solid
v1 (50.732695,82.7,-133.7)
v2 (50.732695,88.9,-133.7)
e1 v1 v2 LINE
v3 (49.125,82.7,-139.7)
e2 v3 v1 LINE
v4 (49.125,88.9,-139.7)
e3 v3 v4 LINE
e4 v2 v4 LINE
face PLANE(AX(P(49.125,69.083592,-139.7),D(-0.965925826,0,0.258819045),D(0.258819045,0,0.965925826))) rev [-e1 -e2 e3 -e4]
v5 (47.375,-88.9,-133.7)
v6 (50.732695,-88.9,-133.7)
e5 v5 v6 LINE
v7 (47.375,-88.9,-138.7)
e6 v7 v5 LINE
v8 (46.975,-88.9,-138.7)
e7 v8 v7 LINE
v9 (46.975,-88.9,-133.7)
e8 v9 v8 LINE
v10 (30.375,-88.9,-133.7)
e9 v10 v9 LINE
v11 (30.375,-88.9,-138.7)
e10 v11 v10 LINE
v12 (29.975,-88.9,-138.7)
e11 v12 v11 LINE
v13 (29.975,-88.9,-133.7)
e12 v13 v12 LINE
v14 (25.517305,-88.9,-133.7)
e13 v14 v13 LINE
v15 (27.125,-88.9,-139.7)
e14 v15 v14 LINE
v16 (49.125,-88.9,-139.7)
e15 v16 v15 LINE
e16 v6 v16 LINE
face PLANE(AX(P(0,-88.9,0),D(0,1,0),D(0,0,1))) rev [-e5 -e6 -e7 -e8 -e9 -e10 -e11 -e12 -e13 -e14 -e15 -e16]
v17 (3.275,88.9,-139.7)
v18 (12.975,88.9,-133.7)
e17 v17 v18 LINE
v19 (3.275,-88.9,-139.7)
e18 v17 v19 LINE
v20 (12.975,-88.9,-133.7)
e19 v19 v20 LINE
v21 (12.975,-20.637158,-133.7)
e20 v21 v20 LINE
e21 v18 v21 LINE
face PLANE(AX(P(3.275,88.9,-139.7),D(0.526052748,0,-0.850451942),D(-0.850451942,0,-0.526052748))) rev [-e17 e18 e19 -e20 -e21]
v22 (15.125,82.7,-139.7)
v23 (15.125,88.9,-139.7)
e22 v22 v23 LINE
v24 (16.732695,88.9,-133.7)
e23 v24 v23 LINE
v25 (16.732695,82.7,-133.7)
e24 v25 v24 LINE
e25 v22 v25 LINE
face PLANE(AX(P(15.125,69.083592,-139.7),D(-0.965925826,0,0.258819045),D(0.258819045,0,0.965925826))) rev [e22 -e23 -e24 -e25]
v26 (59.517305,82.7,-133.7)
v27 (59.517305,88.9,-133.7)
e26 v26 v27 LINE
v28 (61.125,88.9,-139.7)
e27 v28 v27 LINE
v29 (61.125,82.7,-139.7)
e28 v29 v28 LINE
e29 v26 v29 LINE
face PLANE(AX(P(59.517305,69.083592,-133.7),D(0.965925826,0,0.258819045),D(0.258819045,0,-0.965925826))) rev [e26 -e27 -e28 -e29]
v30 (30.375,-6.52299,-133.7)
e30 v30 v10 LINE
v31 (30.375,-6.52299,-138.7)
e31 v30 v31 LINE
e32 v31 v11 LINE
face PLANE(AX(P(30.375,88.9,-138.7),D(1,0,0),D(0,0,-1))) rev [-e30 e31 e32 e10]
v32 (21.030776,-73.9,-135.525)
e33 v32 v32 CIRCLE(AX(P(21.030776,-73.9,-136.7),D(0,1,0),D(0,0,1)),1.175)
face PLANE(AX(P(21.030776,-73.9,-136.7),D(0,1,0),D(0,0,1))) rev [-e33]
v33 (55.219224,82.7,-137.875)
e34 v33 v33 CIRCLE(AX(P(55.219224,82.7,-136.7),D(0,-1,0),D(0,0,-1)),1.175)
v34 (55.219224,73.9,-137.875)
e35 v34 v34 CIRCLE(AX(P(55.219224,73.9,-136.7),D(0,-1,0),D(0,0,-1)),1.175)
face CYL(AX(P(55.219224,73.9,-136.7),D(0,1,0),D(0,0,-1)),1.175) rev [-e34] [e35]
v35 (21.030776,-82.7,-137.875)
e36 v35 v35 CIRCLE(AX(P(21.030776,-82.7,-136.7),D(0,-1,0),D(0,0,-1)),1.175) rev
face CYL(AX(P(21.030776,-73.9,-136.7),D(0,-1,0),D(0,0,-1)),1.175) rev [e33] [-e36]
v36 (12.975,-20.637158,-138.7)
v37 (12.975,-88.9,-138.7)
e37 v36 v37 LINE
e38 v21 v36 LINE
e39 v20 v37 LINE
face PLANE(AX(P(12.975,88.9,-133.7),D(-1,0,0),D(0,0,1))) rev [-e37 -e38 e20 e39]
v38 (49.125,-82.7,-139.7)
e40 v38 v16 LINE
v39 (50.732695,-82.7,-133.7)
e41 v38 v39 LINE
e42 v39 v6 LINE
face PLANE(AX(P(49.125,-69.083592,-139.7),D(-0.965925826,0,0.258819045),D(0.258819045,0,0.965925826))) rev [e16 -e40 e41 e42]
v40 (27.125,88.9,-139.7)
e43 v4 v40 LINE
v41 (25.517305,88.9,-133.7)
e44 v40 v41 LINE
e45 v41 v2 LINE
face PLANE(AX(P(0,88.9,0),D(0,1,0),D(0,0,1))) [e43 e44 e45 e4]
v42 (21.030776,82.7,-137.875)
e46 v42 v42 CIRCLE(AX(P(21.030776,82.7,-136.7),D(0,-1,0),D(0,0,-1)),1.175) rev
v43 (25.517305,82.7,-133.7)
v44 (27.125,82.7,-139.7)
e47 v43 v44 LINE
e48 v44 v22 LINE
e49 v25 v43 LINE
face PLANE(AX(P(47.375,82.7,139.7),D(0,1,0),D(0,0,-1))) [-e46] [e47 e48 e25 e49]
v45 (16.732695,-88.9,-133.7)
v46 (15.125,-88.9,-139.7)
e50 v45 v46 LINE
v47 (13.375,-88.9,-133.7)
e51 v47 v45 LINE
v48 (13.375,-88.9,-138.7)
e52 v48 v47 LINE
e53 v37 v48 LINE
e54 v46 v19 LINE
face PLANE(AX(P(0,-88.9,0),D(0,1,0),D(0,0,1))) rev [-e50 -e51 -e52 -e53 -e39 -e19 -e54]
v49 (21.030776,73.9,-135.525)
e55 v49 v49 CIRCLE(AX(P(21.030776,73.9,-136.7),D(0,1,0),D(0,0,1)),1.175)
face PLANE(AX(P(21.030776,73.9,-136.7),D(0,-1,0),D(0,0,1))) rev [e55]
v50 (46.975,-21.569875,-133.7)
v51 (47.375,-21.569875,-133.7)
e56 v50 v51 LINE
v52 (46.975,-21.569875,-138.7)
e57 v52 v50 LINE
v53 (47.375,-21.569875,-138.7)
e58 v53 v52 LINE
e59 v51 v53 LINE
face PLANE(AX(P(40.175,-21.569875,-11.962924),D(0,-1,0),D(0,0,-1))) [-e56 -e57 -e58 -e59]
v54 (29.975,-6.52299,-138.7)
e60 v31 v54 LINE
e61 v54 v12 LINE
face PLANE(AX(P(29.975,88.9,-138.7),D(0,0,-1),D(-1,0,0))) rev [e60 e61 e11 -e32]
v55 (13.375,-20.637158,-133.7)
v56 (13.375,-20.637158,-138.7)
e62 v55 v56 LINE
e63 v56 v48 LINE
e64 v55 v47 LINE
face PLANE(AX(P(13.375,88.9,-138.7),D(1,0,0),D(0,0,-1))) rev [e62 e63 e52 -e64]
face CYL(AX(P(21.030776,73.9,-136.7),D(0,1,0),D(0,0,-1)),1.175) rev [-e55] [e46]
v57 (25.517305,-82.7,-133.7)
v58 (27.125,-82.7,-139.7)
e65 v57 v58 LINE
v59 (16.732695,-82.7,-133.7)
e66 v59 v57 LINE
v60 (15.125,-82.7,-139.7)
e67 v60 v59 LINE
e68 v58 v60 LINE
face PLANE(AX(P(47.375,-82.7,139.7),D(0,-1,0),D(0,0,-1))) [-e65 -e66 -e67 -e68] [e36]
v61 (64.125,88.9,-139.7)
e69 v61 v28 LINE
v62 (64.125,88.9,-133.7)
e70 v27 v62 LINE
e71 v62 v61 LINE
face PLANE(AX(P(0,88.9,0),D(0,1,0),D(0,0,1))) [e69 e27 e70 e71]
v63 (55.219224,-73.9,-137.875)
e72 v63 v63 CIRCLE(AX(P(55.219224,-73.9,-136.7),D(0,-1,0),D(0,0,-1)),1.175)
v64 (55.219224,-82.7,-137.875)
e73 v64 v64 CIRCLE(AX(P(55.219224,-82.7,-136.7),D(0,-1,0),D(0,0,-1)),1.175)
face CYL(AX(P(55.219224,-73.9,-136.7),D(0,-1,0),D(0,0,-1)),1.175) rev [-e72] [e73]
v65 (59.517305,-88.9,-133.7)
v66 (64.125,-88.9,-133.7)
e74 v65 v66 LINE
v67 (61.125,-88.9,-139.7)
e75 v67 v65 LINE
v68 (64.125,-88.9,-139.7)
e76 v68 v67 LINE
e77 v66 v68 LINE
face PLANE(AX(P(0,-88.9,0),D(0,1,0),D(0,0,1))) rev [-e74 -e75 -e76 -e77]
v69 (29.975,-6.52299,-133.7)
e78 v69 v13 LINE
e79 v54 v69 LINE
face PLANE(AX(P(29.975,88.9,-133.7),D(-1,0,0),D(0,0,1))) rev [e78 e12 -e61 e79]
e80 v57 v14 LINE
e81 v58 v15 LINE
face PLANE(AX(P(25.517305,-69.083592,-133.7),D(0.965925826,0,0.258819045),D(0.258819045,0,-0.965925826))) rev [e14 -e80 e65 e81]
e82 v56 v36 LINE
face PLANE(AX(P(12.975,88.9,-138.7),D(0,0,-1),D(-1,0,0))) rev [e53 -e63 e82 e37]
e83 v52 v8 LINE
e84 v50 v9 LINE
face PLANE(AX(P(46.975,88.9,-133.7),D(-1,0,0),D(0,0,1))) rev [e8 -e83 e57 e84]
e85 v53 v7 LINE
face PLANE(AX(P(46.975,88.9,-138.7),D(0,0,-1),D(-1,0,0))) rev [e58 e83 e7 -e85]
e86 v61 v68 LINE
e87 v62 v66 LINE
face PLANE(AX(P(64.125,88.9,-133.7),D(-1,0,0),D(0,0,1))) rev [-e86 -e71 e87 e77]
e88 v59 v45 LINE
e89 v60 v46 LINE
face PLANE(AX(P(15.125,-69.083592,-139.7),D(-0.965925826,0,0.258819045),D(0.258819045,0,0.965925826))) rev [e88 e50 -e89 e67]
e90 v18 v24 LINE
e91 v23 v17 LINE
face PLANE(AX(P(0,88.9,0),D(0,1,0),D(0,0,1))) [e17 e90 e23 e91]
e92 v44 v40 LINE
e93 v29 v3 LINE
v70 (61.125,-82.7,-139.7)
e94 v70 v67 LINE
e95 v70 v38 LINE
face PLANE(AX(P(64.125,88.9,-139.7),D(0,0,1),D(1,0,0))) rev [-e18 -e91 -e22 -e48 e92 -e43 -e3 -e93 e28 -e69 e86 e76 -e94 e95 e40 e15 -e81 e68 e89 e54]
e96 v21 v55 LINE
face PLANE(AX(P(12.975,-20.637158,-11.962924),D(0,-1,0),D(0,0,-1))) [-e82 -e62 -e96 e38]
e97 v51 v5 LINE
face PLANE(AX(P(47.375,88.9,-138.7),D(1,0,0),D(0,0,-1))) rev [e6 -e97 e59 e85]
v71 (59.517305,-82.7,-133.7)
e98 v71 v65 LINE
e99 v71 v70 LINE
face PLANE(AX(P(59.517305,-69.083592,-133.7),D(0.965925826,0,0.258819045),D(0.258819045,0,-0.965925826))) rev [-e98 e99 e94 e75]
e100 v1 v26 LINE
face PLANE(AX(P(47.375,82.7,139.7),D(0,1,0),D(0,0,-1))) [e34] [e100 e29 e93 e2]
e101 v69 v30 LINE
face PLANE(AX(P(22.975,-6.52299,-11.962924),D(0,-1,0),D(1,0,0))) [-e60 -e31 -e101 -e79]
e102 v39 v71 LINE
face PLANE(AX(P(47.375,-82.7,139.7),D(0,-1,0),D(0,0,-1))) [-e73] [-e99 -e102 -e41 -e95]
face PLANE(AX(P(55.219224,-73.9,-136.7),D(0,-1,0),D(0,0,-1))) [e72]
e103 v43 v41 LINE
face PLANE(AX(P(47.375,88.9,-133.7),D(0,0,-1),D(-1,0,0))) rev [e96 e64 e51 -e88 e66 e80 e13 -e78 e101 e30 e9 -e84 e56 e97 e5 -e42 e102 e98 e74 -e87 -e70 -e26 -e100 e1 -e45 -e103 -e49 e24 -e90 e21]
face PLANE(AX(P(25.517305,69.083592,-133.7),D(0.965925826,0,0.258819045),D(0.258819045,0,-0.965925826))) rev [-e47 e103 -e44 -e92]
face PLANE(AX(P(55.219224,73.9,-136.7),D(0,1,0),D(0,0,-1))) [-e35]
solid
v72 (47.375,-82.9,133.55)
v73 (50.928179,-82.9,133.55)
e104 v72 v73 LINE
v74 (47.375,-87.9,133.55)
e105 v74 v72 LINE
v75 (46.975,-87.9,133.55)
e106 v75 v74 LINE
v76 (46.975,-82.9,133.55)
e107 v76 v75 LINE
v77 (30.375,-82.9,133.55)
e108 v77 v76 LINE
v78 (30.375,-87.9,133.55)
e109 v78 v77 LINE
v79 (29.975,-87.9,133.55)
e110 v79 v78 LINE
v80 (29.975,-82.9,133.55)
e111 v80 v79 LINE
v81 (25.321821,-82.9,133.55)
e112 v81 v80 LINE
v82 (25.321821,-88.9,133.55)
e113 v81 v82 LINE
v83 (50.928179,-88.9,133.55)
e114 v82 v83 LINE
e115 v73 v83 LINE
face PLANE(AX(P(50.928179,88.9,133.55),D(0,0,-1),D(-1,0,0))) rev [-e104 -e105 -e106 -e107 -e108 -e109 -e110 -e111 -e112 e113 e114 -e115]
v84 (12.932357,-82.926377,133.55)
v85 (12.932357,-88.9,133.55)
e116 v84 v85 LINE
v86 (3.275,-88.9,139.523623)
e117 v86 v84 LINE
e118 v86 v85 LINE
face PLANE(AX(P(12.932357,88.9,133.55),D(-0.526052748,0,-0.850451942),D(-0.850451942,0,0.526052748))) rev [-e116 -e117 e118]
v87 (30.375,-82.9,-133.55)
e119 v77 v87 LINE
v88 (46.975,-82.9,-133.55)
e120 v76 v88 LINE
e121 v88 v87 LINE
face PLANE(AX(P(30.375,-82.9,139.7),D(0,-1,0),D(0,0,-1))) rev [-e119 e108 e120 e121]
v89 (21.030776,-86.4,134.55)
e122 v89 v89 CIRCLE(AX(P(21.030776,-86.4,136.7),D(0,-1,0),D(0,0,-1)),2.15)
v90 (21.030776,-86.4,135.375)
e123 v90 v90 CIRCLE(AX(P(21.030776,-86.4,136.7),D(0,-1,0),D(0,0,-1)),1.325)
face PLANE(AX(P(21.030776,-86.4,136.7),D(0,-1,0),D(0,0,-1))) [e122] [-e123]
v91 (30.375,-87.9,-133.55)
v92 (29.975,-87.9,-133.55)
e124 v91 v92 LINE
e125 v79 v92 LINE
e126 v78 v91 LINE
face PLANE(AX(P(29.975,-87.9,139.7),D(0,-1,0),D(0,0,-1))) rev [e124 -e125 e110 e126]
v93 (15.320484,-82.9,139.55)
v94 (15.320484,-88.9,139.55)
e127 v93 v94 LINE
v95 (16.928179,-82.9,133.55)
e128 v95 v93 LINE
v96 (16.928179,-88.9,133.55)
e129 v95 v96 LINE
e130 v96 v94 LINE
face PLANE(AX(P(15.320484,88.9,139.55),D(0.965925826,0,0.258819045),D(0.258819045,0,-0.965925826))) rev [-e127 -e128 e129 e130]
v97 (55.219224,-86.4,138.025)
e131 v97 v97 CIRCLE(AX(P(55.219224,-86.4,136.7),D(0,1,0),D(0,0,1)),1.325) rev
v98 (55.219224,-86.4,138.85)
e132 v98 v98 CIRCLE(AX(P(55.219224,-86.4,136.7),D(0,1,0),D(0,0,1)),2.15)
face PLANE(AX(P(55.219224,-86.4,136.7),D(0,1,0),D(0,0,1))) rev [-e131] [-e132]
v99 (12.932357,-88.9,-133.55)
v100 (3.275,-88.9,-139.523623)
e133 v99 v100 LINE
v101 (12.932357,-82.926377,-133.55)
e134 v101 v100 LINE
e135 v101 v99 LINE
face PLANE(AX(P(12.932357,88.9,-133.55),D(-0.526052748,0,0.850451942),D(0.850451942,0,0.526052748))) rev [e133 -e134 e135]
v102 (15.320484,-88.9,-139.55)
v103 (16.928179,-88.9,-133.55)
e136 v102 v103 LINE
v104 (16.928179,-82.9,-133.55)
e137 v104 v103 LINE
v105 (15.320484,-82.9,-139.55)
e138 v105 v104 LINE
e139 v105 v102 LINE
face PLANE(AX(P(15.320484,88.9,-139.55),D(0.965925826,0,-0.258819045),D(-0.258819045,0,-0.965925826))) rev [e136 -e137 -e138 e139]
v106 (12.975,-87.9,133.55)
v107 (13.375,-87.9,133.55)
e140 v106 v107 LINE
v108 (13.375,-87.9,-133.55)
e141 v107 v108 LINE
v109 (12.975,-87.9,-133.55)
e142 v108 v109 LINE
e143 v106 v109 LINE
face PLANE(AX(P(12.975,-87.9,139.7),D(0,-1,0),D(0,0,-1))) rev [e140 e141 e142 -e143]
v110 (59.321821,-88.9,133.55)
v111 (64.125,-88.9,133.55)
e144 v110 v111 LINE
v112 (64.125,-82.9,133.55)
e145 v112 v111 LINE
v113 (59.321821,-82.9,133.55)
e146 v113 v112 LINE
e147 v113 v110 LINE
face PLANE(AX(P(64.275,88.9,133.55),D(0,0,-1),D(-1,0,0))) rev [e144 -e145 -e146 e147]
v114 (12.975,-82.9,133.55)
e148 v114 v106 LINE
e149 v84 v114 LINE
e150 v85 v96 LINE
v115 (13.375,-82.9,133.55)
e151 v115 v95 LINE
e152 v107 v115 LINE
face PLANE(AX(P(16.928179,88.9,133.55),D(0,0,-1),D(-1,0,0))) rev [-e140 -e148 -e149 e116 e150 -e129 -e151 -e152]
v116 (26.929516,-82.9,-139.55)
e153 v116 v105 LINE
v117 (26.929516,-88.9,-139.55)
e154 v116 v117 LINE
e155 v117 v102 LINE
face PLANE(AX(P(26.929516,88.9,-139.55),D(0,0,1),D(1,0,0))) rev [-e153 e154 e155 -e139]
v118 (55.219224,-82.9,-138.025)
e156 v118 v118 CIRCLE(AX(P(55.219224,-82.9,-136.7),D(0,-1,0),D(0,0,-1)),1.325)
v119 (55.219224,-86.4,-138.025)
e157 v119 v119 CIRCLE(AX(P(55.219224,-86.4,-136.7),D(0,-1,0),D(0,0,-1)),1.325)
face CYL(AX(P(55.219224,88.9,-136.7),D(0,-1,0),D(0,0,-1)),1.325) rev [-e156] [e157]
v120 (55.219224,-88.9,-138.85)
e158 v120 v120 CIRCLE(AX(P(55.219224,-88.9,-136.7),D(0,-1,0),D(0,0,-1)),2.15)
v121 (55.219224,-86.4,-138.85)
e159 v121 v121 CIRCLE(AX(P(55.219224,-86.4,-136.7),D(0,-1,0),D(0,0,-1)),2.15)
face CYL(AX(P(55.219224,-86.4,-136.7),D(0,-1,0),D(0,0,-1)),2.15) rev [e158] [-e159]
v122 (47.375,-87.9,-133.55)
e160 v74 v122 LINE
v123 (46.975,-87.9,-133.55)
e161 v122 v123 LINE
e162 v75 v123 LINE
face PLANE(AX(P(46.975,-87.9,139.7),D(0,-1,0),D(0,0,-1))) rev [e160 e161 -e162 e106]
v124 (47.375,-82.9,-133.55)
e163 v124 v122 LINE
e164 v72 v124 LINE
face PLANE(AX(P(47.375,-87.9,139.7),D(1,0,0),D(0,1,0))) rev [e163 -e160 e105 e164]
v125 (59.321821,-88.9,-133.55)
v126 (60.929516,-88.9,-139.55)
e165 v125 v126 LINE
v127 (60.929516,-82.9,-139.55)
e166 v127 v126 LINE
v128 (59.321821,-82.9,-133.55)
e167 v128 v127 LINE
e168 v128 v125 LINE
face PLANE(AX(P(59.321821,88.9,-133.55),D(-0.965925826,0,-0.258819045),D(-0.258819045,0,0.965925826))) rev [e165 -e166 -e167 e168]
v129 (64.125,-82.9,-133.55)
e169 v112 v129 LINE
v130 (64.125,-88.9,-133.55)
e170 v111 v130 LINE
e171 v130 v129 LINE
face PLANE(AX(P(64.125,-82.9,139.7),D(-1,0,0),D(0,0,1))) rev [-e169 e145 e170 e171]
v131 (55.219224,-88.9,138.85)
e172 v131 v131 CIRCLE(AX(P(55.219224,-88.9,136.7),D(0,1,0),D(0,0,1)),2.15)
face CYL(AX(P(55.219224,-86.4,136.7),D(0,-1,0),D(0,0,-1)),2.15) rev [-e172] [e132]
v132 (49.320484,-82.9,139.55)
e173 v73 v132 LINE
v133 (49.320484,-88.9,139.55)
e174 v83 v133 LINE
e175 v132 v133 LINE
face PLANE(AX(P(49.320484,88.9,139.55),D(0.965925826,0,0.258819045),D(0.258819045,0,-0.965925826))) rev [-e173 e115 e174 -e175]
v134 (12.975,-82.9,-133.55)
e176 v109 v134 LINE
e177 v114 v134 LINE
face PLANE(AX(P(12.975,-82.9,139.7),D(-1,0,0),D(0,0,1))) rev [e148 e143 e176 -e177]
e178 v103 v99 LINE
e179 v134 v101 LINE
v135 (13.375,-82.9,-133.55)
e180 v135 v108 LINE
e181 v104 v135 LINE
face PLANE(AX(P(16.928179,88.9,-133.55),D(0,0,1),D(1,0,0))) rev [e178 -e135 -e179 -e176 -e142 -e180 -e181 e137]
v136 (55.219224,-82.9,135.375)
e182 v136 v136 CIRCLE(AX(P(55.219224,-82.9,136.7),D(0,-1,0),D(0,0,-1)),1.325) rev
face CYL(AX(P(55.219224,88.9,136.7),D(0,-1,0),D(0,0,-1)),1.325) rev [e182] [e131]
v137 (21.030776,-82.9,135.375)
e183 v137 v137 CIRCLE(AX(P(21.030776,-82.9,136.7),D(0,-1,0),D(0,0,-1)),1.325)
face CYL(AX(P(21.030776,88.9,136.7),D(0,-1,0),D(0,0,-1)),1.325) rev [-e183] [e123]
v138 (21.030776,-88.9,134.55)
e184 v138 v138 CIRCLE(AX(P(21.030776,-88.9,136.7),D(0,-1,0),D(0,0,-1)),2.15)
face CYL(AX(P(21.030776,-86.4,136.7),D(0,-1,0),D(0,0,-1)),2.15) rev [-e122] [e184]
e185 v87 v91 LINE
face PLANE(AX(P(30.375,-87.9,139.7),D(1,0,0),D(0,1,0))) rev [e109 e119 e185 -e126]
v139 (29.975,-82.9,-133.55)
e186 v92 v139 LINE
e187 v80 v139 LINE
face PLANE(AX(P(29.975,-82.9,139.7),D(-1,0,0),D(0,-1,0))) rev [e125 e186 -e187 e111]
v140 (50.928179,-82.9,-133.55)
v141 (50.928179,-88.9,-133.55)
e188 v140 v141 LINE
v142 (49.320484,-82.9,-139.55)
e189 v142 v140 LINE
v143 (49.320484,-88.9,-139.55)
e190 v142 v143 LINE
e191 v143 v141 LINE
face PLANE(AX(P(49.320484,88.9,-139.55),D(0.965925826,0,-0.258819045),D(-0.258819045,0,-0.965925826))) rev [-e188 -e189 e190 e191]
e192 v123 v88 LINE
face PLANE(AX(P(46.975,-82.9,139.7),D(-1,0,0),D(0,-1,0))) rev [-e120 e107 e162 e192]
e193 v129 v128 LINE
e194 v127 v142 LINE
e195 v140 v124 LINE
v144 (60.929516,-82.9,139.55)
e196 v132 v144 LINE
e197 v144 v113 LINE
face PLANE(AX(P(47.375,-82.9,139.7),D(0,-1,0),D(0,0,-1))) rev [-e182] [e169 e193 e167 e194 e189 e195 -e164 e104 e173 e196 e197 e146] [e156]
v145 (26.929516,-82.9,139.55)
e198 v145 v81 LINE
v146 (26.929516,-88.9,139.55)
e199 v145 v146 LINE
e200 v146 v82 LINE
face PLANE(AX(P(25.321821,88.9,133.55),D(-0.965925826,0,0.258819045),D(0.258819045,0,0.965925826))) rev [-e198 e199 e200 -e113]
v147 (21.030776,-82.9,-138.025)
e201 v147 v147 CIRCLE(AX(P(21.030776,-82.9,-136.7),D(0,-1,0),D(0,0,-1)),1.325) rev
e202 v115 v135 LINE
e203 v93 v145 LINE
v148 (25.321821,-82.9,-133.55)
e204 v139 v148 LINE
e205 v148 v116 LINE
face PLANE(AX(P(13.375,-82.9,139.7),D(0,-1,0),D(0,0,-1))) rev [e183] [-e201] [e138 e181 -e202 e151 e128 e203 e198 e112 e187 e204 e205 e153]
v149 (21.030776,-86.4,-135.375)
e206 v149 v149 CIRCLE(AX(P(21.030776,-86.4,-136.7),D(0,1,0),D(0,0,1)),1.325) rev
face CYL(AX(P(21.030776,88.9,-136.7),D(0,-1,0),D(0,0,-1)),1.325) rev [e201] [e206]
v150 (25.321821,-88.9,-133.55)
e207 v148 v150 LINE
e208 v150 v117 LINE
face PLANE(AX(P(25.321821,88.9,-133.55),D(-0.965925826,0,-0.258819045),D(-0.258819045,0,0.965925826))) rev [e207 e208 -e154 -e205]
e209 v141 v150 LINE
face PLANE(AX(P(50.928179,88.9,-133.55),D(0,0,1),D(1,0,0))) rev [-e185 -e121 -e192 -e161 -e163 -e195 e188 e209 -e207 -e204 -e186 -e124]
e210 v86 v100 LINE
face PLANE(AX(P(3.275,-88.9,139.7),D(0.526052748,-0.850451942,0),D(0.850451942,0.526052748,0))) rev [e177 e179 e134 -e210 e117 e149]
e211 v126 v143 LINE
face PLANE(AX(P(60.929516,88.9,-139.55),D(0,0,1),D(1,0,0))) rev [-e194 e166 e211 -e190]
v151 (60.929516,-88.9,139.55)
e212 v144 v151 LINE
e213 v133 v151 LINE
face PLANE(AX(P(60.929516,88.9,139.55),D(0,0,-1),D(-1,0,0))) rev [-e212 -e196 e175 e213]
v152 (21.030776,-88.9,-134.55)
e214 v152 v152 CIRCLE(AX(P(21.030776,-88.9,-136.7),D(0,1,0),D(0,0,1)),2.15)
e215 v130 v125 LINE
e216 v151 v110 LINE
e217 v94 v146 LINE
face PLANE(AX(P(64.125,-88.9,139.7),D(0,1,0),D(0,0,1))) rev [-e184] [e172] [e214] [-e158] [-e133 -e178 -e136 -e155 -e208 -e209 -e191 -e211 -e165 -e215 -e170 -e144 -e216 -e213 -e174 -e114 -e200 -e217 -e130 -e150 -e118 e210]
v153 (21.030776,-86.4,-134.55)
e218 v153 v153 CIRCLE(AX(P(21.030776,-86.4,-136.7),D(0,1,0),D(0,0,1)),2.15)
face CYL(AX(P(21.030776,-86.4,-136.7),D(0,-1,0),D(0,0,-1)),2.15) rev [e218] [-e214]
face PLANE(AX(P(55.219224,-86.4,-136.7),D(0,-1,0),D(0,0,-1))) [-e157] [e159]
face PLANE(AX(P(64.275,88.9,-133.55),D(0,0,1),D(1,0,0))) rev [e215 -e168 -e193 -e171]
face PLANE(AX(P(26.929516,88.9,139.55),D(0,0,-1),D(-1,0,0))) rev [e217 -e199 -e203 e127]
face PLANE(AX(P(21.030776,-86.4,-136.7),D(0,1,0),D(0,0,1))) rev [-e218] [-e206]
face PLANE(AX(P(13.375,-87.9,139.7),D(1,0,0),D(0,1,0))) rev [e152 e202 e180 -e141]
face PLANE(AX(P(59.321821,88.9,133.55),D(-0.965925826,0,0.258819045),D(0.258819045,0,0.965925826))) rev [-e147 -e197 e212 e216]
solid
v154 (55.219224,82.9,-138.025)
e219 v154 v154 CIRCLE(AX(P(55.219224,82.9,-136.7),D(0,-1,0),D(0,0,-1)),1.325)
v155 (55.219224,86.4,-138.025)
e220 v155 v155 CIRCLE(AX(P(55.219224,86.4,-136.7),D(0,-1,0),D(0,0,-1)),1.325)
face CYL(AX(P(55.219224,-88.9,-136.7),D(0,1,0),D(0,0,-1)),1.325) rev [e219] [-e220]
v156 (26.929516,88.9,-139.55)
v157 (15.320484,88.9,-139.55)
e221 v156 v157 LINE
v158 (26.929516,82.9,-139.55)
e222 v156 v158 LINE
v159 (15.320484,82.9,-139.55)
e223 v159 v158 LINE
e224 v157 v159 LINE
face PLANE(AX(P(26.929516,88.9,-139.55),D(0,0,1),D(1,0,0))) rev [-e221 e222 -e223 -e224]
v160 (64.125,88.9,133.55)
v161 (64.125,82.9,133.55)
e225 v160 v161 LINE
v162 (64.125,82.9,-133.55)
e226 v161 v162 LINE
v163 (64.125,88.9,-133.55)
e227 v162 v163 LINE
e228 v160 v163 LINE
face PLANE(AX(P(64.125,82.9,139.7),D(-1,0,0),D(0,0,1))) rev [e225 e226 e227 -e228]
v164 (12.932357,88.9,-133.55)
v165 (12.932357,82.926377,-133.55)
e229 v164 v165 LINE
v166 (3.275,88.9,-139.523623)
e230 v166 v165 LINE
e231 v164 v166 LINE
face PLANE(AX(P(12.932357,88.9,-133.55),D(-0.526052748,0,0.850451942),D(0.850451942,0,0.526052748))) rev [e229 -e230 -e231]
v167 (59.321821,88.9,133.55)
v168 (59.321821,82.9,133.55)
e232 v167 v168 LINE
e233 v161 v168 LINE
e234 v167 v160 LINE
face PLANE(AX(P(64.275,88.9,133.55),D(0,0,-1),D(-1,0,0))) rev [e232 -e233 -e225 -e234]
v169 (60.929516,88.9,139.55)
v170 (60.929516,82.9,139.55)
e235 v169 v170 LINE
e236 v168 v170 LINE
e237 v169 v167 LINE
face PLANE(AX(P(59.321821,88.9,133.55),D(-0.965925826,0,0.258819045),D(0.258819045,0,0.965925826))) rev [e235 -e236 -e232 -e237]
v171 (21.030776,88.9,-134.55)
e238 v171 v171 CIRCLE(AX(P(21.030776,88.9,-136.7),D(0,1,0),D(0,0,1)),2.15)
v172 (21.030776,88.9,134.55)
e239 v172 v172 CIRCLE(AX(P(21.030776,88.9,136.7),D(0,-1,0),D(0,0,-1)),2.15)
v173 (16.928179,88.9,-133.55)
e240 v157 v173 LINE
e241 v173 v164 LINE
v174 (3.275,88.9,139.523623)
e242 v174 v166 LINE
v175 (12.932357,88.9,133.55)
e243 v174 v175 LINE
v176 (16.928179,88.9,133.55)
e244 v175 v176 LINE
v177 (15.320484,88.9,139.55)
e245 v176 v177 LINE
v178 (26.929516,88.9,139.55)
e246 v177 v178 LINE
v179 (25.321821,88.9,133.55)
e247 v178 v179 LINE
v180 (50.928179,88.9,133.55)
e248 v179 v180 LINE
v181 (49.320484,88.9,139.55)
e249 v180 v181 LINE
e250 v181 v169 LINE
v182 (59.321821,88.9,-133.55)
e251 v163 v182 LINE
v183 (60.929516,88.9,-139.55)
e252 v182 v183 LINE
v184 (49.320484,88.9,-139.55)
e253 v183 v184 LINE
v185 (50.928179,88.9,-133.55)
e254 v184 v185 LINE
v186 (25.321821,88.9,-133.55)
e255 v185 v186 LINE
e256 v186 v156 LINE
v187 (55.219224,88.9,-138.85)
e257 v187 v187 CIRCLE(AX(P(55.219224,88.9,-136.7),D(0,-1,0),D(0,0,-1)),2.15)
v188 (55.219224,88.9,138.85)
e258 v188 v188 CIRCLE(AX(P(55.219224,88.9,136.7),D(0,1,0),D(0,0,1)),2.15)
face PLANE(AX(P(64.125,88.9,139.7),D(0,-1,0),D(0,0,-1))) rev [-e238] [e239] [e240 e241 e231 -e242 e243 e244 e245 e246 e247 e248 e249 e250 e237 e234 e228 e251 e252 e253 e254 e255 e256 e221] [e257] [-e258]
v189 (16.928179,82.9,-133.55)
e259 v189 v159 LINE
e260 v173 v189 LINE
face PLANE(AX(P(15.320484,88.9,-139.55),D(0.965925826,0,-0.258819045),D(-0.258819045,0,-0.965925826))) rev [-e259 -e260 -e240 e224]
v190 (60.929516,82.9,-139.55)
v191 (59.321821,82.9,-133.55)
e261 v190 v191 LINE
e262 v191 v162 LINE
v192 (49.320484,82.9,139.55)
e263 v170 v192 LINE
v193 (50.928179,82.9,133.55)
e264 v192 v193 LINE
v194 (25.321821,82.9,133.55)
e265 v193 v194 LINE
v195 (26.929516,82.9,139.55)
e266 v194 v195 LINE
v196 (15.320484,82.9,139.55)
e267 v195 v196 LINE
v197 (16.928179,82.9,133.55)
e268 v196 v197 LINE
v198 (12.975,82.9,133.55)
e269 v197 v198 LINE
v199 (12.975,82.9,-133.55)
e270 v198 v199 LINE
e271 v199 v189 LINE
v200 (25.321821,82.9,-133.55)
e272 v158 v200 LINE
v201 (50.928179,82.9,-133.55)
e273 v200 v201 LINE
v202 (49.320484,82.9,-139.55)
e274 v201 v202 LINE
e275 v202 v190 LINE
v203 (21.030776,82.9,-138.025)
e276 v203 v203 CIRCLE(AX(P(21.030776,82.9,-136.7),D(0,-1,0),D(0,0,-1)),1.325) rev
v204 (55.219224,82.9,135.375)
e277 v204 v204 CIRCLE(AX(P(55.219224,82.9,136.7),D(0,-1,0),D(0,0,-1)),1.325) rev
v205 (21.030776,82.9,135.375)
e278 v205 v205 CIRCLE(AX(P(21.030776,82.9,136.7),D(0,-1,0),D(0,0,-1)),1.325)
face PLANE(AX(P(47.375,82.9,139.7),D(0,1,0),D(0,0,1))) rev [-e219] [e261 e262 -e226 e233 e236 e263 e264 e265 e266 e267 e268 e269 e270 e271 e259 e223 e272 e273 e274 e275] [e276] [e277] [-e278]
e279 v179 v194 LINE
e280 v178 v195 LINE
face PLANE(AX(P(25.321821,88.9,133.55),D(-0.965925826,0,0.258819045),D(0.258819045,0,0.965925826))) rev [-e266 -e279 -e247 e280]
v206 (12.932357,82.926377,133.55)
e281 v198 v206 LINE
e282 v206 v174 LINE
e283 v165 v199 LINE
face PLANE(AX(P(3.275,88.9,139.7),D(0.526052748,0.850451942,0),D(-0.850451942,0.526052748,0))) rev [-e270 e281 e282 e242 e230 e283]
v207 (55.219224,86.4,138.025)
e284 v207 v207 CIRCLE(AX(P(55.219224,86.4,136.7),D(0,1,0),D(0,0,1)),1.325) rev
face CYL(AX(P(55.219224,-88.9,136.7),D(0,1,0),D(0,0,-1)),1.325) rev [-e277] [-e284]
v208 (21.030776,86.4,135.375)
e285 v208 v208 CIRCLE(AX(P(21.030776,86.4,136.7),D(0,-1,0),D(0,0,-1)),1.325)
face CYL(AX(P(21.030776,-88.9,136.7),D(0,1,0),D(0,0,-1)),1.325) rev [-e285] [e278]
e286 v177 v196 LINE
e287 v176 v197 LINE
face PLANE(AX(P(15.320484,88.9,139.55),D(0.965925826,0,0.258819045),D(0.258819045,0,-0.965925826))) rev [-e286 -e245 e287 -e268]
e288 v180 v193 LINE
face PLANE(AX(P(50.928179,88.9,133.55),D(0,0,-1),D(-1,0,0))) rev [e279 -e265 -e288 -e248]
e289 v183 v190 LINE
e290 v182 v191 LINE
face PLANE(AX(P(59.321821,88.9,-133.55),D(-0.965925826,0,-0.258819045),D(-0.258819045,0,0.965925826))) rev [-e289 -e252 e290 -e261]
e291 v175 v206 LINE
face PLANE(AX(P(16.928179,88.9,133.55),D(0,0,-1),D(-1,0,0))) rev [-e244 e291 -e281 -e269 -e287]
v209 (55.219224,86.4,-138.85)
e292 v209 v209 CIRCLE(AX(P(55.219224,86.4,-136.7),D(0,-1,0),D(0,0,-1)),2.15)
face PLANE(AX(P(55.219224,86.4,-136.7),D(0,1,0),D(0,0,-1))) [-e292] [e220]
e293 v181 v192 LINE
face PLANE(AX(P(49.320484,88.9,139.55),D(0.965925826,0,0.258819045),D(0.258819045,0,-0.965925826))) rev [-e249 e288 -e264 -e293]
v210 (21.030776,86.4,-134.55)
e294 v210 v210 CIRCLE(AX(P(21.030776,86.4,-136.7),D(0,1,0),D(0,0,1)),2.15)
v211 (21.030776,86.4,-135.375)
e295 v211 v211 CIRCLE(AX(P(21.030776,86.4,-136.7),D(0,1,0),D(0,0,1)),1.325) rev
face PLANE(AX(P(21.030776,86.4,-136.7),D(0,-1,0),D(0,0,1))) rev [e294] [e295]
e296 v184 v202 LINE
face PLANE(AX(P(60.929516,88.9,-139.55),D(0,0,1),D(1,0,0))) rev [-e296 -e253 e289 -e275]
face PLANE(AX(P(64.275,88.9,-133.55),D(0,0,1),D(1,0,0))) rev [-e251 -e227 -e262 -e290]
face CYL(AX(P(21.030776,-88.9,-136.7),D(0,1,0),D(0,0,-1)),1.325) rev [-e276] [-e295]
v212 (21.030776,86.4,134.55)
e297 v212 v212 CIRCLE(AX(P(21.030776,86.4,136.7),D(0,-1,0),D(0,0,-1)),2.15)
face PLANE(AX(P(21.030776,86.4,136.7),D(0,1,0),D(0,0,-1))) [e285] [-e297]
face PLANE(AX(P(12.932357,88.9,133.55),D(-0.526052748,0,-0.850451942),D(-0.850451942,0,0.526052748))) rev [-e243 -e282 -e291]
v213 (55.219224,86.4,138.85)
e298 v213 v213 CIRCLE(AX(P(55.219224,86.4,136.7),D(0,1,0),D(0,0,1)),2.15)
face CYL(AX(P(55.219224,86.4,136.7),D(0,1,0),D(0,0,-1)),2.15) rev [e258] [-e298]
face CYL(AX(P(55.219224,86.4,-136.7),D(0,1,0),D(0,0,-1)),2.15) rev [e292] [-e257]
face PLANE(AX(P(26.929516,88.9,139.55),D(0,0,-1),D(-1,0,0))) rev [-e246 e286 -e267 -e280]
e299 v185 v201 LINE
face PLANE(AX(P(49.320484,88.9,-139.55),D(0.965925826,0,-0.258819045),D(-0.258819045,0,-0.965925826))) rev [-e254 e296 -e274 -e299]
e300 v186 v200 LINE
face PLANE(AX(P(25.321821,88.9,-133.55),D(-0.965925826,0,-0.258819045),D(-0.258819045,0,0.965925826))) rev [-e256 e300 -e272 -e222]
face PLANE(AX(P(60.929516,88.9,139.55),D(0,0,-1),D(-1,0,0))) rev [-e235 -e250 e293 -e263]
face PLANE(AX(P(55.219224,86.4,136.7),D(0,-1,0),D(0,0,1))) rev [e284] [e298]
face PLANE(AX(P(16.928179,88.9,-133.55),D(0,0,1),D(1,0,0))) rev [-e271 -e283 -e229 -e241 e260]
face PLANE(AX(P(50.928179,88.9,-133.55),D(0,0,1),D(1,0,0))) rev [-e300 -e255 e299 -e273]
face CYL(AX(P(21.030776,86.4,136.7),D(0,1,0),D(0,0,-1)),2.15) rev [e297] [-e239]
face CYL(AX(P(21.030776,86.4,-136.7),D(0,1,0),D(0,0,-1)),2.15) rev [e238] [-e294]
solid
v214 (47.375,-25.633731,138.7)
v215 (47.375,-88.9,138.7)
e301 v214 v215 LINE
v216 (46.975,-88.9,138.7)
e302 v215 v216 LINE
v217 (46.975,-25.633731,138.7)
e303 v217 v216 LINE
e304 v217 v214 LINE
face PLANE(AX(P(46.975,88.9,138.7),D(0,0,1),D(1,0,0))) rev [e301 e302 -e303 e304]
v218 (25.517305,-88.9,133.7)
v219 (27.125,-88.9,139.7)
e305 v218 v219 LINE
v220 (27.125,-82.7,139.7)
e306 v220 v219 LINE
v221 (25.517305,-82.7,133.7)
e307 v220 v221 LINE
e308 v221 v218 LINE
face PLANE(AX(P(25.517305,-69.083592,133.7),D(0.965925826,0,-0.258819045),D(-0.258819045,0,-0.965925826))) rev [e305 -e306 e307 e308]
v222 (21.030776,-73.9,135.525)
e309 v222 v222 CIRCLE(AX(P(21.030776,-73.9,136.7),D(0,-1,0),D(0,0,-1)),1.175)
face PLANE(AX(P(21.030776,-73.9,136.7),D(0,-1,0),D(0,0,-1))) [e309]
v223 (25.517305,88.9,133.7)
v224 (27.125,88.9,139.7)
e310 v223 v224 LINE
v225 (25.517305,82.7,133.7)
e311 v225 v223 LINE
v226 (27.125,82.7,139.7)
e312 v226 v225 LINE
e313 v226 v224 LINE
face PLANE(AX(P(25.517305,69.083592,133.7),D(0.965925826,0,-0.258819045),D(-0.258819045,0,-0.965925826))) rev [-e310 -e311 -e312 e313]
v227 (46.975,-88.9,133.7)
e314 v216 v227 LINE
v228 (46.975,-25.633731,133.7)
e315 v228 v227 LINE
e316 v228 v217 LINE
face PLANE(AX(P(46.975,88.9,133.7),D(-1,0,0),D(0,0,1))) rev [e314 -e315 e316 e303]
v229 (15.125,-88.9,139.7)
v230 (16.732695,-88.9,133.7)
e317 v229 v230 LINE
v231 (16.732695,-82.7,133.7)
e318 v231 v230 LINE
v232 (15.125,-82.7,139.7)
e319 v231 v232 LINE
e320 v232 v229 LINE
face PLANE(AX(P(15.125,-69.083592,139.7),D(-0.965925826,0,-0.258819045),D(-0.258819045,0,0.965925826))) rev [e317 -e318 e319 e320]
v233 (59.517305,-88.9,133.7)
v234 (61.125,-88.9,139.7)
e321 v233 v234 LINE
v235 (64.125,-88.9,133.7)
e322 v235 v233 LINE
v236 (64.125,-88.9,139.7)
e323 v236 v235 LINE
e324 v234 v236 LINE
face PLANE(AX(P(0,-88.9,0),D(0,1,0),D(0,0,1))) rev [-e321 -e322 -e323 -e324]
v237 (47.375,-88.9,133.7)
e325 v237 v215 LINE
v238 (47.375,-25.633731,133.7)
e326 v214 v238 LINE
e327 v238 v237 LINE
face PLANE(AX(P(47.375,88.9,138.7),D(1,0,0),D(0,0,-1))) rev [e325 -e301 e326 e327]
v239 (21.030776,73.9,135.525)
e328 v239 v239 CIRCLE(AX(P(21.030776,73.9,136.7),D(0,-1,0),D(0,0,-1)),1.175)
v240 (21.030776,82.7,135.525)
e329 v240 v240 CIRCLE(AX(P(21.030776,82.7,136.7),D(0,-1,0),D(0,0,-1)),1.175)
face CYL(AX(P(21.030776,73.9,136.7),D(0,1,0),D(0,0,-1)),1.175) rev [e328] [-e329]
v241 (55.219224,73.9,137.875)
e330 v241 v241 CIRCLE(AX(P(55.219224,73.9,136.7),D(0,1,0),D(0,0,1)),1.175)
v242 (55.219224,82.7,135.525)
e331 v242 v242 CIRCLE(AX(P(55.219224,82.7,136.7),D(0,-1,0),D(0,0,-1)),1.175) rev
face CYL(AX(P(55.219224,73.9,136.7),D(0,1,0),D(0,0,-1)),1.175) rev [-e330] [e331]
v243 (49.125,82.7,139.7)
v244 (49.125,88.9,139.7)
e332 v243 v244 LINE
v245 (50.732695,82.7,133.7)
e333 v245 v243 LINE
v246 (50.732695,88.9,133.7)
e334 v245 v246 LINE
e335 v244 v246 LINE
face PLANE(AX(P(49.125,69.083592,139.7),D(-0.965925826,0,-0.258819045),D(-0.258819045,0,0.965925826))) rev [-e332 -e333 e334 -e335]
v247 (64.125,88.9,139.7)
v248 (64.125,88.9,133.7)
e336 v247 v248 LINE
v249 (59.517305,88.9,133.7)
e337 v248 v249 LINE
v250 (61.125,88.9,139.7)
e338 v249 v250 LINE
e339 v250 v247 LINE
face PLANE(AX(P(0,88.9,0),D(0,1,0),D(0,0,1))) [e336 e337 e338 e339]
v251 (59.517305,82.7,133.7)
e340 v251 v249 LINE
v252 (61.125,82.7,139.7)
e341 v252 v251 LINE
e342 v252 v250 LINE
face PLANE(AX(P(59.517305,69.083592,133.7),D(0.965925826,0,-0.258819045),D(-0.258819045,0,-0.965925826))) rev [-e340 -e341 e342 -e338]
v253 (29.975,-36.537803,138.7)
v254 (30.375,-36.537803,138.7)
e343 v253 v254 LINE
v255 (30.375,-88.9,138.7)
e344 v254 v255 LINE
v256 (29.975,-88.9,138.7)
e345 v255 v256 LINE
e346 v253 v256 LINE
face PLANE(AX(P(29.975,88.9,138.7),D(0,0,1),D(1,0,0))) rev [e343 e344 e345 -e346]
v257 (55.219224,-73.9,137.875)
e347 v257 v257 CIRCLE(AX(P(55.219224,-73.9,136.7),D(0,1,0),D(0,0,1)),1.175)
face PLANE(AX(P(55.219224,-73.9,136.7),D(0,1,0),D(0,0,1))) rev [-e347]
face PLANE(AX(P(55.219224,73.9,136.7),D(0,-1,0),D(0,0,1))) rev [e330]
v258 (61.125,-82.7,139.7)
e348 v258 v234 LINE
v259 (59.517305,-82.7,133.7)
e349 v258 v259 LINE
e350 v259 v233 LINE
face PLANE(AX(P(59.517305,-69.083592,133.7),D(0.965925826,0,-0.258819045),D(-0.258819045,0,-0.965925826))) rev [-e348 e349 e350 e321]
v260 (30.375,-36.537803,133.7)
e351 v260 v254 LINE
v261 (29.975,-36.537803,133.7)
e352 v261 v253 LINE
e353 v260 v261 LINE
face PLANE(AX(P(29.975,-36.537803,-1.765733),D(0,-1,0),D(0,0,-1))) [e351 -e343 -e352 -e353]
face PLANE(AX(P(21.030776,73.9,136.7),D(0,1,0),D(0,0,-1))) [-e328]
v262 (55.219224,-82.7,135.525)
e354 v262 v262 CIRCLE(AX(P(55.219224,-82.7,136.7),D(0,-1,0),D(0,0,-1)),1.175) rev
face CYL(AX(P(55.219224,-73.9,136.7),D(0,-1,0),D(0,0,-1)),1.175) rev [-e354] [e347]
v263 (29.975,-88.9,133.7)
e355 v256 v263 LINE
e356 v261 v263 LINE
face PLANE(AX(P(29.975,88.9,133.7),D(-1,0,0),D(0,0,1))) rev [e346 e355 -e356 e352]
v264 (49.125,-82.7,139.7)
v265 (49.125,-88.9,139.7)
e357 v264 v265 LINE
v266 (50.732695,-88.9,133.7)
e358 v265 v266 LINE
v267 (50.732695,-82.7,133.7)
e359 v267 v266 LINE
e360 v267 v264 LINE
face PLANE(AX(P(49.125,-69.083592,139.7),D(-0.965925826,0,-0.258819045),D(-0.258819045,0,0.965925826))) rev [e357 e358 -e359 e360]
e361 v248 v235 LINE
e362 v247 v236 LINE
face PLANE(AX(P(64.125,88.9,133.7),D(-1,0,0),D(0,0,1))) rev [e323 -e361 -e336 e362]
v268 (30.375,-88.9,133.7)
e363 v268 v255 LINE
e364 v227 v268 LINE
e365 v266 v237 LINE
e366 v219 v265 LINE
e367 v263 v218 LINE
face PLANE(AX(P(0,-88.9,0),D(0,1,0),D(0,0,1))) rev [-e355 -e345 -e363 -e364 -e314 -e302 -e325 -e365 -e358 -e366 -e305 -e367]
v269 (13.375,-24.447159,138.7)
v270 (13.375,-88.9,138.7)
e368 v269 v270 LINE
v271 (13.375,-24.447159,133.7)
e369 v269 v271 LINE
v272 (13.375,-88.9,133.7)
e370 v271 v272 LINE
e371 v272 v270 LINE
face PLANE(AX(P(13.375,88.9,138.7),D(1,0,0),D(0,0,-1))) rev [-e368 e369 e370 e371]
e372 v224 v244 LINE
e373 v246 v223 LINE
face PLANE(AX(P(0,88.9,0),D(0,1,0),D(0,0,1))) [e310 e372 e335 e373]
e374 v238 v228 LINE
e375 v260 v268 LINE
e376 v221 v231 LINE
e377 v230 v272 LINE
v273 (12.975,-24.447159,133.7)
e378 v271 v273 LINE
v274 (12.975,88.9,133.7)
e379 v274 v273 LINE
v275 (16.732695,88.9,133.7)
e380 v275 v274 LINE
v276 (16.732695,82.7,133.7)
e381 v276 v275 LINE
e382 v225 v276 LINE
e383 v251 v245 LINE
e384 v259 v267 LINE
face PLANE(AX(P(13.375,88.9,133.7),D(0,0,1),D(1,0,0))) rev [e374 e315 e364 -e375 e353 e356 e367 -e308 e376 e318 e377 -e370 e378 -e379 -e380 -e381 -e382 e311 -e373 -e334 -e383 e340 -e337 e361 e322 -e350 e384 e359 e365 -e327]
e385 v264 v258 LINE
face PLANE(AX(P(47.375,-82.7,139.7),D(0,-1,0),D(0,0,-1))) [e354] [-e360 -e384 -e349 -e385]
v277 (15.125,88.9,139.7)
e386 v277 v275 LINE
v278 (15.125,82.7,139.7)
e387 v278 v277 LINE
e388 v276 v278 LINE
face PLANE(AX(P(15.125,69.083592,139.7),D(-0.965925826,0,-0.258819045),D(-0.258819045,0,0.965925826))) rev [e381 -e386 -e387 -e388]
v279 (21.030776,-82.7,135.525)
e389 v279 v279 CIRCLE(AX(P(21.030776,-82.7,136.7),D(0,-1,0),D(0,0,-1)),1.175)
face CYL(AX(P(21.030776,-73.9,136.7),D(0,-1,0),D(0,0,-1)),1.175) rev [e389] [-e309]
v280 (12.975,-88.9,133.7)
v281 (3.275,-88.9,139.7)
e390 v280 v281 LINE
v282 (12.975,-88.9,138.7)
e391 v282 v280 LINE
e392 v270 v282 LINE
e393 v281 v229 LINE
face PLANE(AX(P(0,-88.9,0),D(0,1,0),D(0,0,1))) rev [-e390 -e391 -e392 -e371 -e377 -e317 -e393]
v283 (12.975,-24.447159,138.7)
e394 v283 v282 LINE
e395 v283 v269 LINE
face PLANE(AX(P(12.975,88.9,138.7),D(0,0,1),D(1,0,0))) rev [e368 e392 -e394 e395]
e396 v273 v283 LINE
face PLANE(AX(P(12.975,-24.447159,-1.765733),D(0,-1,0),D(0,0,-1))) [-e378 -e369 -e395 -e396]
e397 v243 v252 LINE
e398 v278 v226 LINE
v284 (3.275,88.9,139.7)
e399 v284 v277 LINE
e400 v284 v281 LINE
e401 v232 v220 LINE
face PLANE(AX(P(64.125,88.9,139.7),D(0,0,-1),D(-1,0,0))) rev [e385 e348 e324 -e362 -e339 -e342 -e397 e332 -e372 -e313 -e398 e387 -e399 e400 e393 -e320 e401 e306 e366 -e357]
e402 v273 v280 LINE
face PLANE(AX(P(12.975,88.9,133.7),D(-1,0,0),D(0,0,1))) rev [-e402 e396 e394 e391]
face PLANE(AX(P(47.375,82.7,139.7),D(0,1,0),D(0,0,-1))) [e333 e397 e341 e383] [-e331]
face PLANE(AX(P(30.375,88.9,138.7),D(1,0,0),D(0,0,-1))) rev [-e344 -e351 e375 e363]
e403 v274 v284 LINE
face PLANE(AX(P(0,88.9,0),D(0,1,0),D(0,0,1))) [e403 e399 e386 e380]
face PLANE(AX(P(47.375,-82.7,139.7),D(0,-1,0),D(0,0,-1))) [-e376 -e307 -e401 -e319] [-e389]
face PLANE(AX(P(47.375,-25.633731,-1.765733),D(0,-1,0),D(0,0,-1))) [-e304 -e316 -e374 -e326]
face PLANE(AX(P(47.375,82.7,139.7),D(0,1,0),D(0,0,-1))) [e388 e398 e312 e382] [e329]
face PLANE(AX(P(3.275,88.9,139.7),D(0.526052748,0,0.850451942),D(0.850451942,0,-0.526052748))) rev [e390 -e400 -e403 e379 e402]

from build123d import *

# Parameters (mm, degrees)
BOSS_EXTRUDE1_DEPTH   = 139.7
BOSS_EXTRUDE1_2_DEPTH = 139.7
BOSS_EXTRUDE2_DEPTH   = 88.9
BOSS_EXTRUDE2_2_DEPTH = 88.9
BOSS_EXTRUDE3_DEPTH   = 6
BOSS_EXTRUDE4_DEPTH   = 6
CUT_EXTRUDE1_DEPTH    = 236.033924413
CUT_EXTRUDE3_DEPTH    = 6.2
SKETCH10_R            = 2.15
CUT_EXTRUDE4_DEPTH    = 2.5
SKETCH10_4_R          = 1.325
CUT_EXTRUDE5_DEPTH    = 236.033924413
SKETCH10_5_R          = 1.175
CUT_EXTRUDE6_DEPTH    = 15
MIRROR3_START         = 73.9
MIRROR3_OUTLINE_R     = 1.175
MIRROR3_DEPTH         = 15
MIRROR3_START_2       = 86.4
MIRROR3_2_OUTLINE_R   = 2.15
MIRROR3_2_OUTLINE_R_2 = 1.175
MIRROR3_2_DEPTH       = 2.5
MIRROR3_START_3       = 82.9
MIRROR3_3_OUTLINE_R   = 1.325
MIRROR3_3_OUTLINE_R_2 = 1.175
MIRROR3_3_DEPTH       = 3.5


# Read off the part's stored shape, not the designer's step: Mirror3
with BuildPart() as part:
    # Sketch1 → Boss-Extrude1 (new, symmetric)
    with BuildSketch(Plane.XY):
        Polygon((3.275, -88.9), (12.975, -82.9), (12.975, -87.9), (13.375, -87.9), (13.375, -82.9), (29.975, -82.9), (29.975, -87.9), (30.375, -87.9), (30.375, -82.9), (46.975, -82.9), (46.975, -87.9), (47.375, -87.9), (47.375, -82.9), (64.125, -82.9), (64.125, -88.9), align=None)
    extrude(amount=BOSS_EXTRUDE1_DEPTH, both=True)


with BuildPart() as body_2:
    # Sketch1 → Boss-Extrude1 2 (new, symmetric)
    with BuildSketch(Plane.XY):
        Polygon((64.125, 88.9), (3.275, 88.9), (12.975, 82.9), (13.375, 82.9), (29.975, 82.9), (30.375, 82.9), (46.975, 82.9), (47.375, 82.9), (64.125, 82.9), align=None)
    extrude(amount=BOSS_EXTRUDE1_2_DEPTH, both=True)


with BuildPart() as body_3:
    # Sketch2 → Boss-Extrude2 (new, symmetric)
    with BuildSketch(Plane(origin=(0, 0, 0), x_dir=(1, 0, 0), z_dir=(0, 1, 0))):
        Polygon((3.275, -139.7), (12.975, -133.7), (12.975, -138.7), (13.375, -138.7), (13.375, -133.7), (29.975, -133.7), (29.975, -138.7), (30.375, -138.7), (30.375, -133.7), (46.975, -133.7), (46.975, -138.7), (47.375, -138.7), (47.375, -133.7), (64.125, -133.7), (64.125, -139.7), align=None)
    extrude(amount=BOSS_EXTRUDE2_DEPTH, both=True)

    # Sketch3 → Boss-Extrude3 (add)
    with BuildSketch(Plane.XY.offset(139.7)):
        Polygon((12.975, 88.9), (12.975, -24.447158706), (29.975, -24.447158706), (29.975, -36.537802732), (30.375, -36.537802732), (46.975, -25.633731009), (47.375, -25.633731009), (64.125, -25.633731009), (64.125, 88.9), align=None)
    extrude(amount=-BOSS_EXTRUDE3_DEPTH)


with BuildPart() as body_4:
    # Sketch2 → Boss-Extrude2 2 (new, symmetric)
    with BuildSketch(Plane(origin=(0, 0, 0), x_dir=(1, 0, 0), z_dir=(0, 1, 0))):
        Polygon((64.125, 139.7), (3.275, 139.7), (12.975, 133.7), (12.975, 138.7), (13.375, 138.7), (13.375, 133.7), (29.975, 133.7), (29.975, 138.7), (30.375, 138.7), (30.375, 133.7), (46.975, 133.7), (46.975, 138.7), (47.375, 138.7), (47.375, 133.7), (64.125, 133.7), align=None)
    extrude(amount=BOSS_EXTRUDE2_2_DEPTH, both=True)

    # Sketch4 → Boss-Extrude4 (add)
    with BuildSketch(Plane(origin=(0, 0, -139.7), x_dir=(-1, 0, 0), z_dir=(0, 0, -1))):
        Polygon((-12.975, 88.9), (-12.975, -20.637158302), (-13.275, -20.637158302), (-22.975, -20.637158302), (-22.975, -6.522989669), (-30.175, -6.522989669), (-40.175, -6.522989669), (-40.175, -21.569874841), (-47.175, -21.569874841), (-64.125, -21.569874841), (-64.125, 88.9), align=None)
    extrude(amount=-BOSS_EXTRUDE4_DEPTH)


with BuildPart() as cut_extrude1_tool:
    # Sketch8 → Cut-Extrude1 (new, through all)
    with BuildSketch(Plane.XZ.offset(88.9)):
        Polygon((64.275, 133.55), (59.321821039, 133.55), (60.929516194, 139.55), (49.320483806, 139.55), (50.928178961, 133.55), (25.321821039, 133.55), (26.929516194, 139.55), (15.320483806, 139.55), (16.928178961, 133.55), (12.932357492, 133.55), (3.125, 139.616406696), (3.125, 144.85), (64.275, 144.85), align=None)
        Polygon((64.275, -144.85), (64.275, -133.55), (59.321821039, -133.55), (60.929516194, -139.55), (49.320483806, -139.55), (50.928178961, -133.55), (25.321821039, -133.55), (26.929516194, -139.55), (15.320483806, -139.55), (16.928178961, -133.55), (12.932357492, -133.55), (3.125, -139.616406696), (3.125, -144.85), align=None)
    extrude(amount=-CUT_EXTRUDE1_DEPTH)


with BuildPart() as part_1:
    add(part.part)

    # Cut-Extrude1: cut by cut_extrude1_tool
    add(cut_extrude1_tool.part, mode=Mode.SUBTRACT)

    # Sketch10 → Cut-Extrude4 (cut)
    with BuildSketch(Plane.XZ.offset(88.9)):
        with Locations(Location((21.030776421, 136.7, 0), (0, 0, 270))):
            Circle(SKETCH10_R)
        with Locations(Location((55.219223579, 136.7, 0), (0, 0, 90))):
            Circle(SKETCH10_R)
        with Locations(Location((55.219223579, -136.7, 0), (0, 0, 270))):
            Circle(SKETCH10_R)
        with Locations(Location((21.030776421, -136.7, 0), (0, 0, 90))):
            Circle(SKETCH10_R)
    extrude(amount=-CUT_EXTRUDE4_DEPTH, mode=Mode.SUBTRACT)

    # Sketch10<4> → Cut-Extrude5 (cut, through all)
    with BuildSketch(Plane.XZ.offset(88.9)):
        with Locations(Location((21.030776421, 136.7, 0), (0, 0, 270))):
            Circle(SKETCH10_4_R)
        with Locations(Location((55.219223579, 136.7, 0), (0, 0, 270))):
            Circle(SKETCH10_4_R)
        with Locations(Location((55.219223579, -136.7, 0), (0, 0, 270))):
            Circle(SKETCH10_4_R)
        with Locations(Location((21.030776421, -136.7, 0), (0, 0, 270))):
            Circle(SKETCH10_4_R)
    extrude(amount=-CUT_EXTRUDE5_DEPTH, mode=Mode.SUBTRACT)


with BuildPart() as body_2_1:
    add(body_2.part)

    # Cut-Extrude1: cut by cut_extrude1_tool
    add(cut_extrude1_tool.part, mode=Mode.SUBTRACT)


with BuildPart() as cut_extrude3_tool:
    # Sketch9 → Cut-Extrude3 (new body)
    with BuildSketch(Plane.XZ.offset(88.9)):
        Polygon((50.732695155, -133.7), (59.517304845, -133.7), (61.125, -139.7), (49.125, -139.7), align=None)
        Polygon((25.517304845, 133.7), (27.125, 139.7), (15.125, 139.7), (16.732695155, 133.7), align=None)
        Polygon((59.517304845, 133.7), (61.125, 139.7), (49.125, 139.7), (50.732695155, 133.7), align=None)
        Polygon((16.732695155, -133.7), (25.517304845, -133.7), (27.125, -139.7), (15.125, -139.7), align=None)
    cut_extrude3 = extrude(amount=-CUT_EXTRUDE3_DEPTH)


with BuildPart() as body_4_1:
    add(body_4.part)

    # Cut-Extrude3: cut by cut_extrude3_tool
    add(cut_extrude3_tool.part, mode=Mode.SUBTRACT)


with BuildPart() as body_3_1:
    add(body_3.part)

    # Cut-Extrude3: cut by cut_extrude3_tool
    add(cut_extrude3_tool.part, mode=Mode.SUBTRACT)


with BuildPart() as mirror2_tool:
    # Mirror2: Cut-Extrude3 across plane
    add(cut_extrude3.mirror(Plane.ZX))


with BuildPart() as body_4_2:
    add(body_4_1.part)

    # Mirror2: cut by mirror2_tool
    add(mirror2_tool.part, mode=Mode.SUBTRACT)


with BuildPart() as body_3_2:
    add(body_3_1.part)

    # Mirror2: cut by mirror2_tool
    add(mirror2_tool.part, mode=Mode.SUBTRACT)


with BuildPart() as cut_extrude6_tool:
    # Sketch10<5> → Cut-Extrude6 (new body)
    with BuildSketch(Plane.XZ.offset(88.9)):
        with Locations(Location((21.030776421, 136.7, 0), (0, 0, 270))):
            Circle(SKETCH10_5_R)
        with Locations(Location((55.219223579, 136.7, 0), (0, 0, 270))):
            Circle(SKETCH10_5_R)
        with Locations(Location((55.219223579, -136.7, 0), (0, 0, 270))):
            Circle(SKETCH10_5_R)
        with Locations(Location((21.030776421, -136.7, 0), (0, 0, 270))):
            Circle(SKETCH10_5_R)
    extrude(amount=-CUT_EXTRUDE6_DEPTH)


with BuildPart() as body_3_3:
    add(body_3_2.part)

    # Cut-Extrude6: cut by cut_extrude6_tool
    add(cut_extrude6_tool.part, mode=Mode.SUBTRACT)


with BuildPart() as body_4_3:
    add(body_4_2.part)

    # Cut-Extrude6: cut by cut_extrude6_tool
    add(cut_extrude6_tool.part, mode=Mode.SUBTRACT)


with BuildPart() as mirror3_tool:
    # Mirror3 outline → Mirror3 (new body)
    with BuildSketch(Plane(origin=(0, 0, 0), x_dir=(1, 0, 0), z_dir=(0, 1, 0)).offset(MIRROR3_START)):
        with Locations((21.030776421, 136.7)):
            Circle(MIRROR3_OUTLINE_R)
        with Locations((55.219223579, 136.7)):
            Circle(MIRROR3_OUTLINE_R)
        with Locations((21.030776421, -136.7)):
            Circle(MIRROR3_OUTLINE_R)
        with Locations((55.219223579, -136.7)):
            Circle(MIRROR3_OUTLINE_R)
    extrude(amount=MIRROR3_DEPTH)


with BuildPart() as body_2_2:
    add(body_2_1.part)

    # Mirror3: cut by mirror3_tool
    add(mirror3_tool.part, mode=Mode.SUBTRACT)

    # Mirror3 2 outline → Mirror3 2 (cut)
    # profile 1 of 4: a face of its own
    with BuildSketch(Plane(origin=(0, 0, 0), x_dir=(1, 0, 0), z_dir=(0, 1, 0)).offset(MIRROR3_START_2)):
        with Locations((21.030776421, -136.7)):
            Circle(MIRROR3_2_OUTLINE_R)
        with Locations((21.030776421, -136.7)):
            Circle(MIRROR3_2_OUTLINE_R_2, mode=Mode.SUBTRACT)
    # profile 2 of 4: a face of its own
    with BuildSketch(Plane(origin=(0, 0, 0), x_dir=(1, 0, 0), z_dir=(0, 1, 0)).offset(MIRROR3_START_2)):
        with Locations((21.030776421, 136.7)):
            Circle(MIRROR3_2_OUTLINE_R)
        with Locations((21.030776421, 136.7)):
            Circle(MIRROR3_2_OUTLINE_R_2, mode=Mode.SUBTRACT)
    # profile 3 of 4: a face of its own
    with BuildSketch(Plane(origin=(0, 0, 0), x_dir=(1, 0, 0), z_dir=(0, 1, 0)).offset(MIRROR3_START_2)):
        with Locations((55.219223579, 136.7)):
            Circle(MIRROR3_2_OUTLINE_R)
        with Locations((55.219223579, 136.7)):
            Circle(MIRROR3_2_OUTLINE_R_2, mode=Mode.SUBTRACT)
    # profile 4 of 4: a face of its own
    with BuildSketch(Plane(origin=(0, 0, 0), x_dir=(1, 0, 0), z_dir=(0, 1, 0)).offset(MIRROR3_START_2)):
        with Locations((55.219223579, -136.7)):
            Circle(MIRROR3_2_OUTLINE_R)
        with Locations((55.219223579, -136.7)):
            Circle(MIRROR3_2_OUTLINE_R_2, mode=Mode.SUBTRACT)
    extrude(amount=MIRROR3_2_DEPTH, mode=Mode.SUBTRACT)

    # Mirror3 3 outline → Mirror3 3 (cut)
    # profile 1 of 4: a face of its own
    with BuildSketch(Plane(origin=(0, 0, 0), x_dir=(1, 0, 0), z_dir=(0, 1, 0)).offset(MIRROR3_START_3)):
        with Locations((21.030776421, 136.7)):
            Circle(MIRROR3_3_OUTLINE_R)
        with Locations((21.030776421, 136.7)):
            Circle(MIRROR3_3_OUTLINE_R_2, mode=Mode.SUBTRACT)
    # profile 2 of 4: a face of its own
    with BuildSketch(Plane(origin=(0, 0, 0), x_dir=(1, 0, 0), z_dir=(0, 1, 0)).offset(MIRROR3_START_3)):
        with Locations((21.030776421, -136.7)):
            Circle(MIRROR3_3_OUTLINE_R)
        with Locations((21.030776421, -136.7)):
            Circle(MIRROR3_3_OUTLINE_R_2, mode=Mode.SUBTRACT)
    # profile 3 of 4: a face of its own
    with BuildSketch(Plane(origin=(0, 0, 0), x_dir=(1, 0, 0), z_dir=(0, 1, 0)).offset(MIRROR3_START_3)):
        with Locations((55.219223579, -136.7)):
            Circle(MIRROR3_3_OUTLINE_R)
        with Locations((55.219223579, -136.7)):
            Circle(MIRROR3_3_OUTLINE_R_2, mode=Mode.SUBTRACT)
    # profile 4 of 4: a face of its own
    with BuildSketch(Plane(origin=(0, 0, 0), x_dir=(1, 0, 0), z_dir=(0, 1, 0)).offset(MIRROR3_START_3)):
        with Locations((55.219223579, 136.7)):
            Circle(MIRROR3_3_OUTLINE_R)
        with Locations((55.219223579, 136.7)):
            Circle(MIRROR3_3_OUTLINE_R_2, mode=Mode.SUBTRACT)
    extrude(amount=MIRROR3_3_DEPTH, mode=Mode.SUBTRACT)


with BuildPart() as body_3_4:
    add(body_3_3.part)

    # Mirror3: cut by mirror3_tool
    add(mirror3_tool.part, mode=Mode.SUBTRACT)


with BuildPart() as body_4_4:
    add(body_4_3.part)

    # Mirror3: cut by mirror3_tool
    add(mirror3_tool.part, mode=Mode.SUBTRACT)


solid = Compound([part_1.part, body_2_2.part, body_3_4.part, body_4_4.part])
